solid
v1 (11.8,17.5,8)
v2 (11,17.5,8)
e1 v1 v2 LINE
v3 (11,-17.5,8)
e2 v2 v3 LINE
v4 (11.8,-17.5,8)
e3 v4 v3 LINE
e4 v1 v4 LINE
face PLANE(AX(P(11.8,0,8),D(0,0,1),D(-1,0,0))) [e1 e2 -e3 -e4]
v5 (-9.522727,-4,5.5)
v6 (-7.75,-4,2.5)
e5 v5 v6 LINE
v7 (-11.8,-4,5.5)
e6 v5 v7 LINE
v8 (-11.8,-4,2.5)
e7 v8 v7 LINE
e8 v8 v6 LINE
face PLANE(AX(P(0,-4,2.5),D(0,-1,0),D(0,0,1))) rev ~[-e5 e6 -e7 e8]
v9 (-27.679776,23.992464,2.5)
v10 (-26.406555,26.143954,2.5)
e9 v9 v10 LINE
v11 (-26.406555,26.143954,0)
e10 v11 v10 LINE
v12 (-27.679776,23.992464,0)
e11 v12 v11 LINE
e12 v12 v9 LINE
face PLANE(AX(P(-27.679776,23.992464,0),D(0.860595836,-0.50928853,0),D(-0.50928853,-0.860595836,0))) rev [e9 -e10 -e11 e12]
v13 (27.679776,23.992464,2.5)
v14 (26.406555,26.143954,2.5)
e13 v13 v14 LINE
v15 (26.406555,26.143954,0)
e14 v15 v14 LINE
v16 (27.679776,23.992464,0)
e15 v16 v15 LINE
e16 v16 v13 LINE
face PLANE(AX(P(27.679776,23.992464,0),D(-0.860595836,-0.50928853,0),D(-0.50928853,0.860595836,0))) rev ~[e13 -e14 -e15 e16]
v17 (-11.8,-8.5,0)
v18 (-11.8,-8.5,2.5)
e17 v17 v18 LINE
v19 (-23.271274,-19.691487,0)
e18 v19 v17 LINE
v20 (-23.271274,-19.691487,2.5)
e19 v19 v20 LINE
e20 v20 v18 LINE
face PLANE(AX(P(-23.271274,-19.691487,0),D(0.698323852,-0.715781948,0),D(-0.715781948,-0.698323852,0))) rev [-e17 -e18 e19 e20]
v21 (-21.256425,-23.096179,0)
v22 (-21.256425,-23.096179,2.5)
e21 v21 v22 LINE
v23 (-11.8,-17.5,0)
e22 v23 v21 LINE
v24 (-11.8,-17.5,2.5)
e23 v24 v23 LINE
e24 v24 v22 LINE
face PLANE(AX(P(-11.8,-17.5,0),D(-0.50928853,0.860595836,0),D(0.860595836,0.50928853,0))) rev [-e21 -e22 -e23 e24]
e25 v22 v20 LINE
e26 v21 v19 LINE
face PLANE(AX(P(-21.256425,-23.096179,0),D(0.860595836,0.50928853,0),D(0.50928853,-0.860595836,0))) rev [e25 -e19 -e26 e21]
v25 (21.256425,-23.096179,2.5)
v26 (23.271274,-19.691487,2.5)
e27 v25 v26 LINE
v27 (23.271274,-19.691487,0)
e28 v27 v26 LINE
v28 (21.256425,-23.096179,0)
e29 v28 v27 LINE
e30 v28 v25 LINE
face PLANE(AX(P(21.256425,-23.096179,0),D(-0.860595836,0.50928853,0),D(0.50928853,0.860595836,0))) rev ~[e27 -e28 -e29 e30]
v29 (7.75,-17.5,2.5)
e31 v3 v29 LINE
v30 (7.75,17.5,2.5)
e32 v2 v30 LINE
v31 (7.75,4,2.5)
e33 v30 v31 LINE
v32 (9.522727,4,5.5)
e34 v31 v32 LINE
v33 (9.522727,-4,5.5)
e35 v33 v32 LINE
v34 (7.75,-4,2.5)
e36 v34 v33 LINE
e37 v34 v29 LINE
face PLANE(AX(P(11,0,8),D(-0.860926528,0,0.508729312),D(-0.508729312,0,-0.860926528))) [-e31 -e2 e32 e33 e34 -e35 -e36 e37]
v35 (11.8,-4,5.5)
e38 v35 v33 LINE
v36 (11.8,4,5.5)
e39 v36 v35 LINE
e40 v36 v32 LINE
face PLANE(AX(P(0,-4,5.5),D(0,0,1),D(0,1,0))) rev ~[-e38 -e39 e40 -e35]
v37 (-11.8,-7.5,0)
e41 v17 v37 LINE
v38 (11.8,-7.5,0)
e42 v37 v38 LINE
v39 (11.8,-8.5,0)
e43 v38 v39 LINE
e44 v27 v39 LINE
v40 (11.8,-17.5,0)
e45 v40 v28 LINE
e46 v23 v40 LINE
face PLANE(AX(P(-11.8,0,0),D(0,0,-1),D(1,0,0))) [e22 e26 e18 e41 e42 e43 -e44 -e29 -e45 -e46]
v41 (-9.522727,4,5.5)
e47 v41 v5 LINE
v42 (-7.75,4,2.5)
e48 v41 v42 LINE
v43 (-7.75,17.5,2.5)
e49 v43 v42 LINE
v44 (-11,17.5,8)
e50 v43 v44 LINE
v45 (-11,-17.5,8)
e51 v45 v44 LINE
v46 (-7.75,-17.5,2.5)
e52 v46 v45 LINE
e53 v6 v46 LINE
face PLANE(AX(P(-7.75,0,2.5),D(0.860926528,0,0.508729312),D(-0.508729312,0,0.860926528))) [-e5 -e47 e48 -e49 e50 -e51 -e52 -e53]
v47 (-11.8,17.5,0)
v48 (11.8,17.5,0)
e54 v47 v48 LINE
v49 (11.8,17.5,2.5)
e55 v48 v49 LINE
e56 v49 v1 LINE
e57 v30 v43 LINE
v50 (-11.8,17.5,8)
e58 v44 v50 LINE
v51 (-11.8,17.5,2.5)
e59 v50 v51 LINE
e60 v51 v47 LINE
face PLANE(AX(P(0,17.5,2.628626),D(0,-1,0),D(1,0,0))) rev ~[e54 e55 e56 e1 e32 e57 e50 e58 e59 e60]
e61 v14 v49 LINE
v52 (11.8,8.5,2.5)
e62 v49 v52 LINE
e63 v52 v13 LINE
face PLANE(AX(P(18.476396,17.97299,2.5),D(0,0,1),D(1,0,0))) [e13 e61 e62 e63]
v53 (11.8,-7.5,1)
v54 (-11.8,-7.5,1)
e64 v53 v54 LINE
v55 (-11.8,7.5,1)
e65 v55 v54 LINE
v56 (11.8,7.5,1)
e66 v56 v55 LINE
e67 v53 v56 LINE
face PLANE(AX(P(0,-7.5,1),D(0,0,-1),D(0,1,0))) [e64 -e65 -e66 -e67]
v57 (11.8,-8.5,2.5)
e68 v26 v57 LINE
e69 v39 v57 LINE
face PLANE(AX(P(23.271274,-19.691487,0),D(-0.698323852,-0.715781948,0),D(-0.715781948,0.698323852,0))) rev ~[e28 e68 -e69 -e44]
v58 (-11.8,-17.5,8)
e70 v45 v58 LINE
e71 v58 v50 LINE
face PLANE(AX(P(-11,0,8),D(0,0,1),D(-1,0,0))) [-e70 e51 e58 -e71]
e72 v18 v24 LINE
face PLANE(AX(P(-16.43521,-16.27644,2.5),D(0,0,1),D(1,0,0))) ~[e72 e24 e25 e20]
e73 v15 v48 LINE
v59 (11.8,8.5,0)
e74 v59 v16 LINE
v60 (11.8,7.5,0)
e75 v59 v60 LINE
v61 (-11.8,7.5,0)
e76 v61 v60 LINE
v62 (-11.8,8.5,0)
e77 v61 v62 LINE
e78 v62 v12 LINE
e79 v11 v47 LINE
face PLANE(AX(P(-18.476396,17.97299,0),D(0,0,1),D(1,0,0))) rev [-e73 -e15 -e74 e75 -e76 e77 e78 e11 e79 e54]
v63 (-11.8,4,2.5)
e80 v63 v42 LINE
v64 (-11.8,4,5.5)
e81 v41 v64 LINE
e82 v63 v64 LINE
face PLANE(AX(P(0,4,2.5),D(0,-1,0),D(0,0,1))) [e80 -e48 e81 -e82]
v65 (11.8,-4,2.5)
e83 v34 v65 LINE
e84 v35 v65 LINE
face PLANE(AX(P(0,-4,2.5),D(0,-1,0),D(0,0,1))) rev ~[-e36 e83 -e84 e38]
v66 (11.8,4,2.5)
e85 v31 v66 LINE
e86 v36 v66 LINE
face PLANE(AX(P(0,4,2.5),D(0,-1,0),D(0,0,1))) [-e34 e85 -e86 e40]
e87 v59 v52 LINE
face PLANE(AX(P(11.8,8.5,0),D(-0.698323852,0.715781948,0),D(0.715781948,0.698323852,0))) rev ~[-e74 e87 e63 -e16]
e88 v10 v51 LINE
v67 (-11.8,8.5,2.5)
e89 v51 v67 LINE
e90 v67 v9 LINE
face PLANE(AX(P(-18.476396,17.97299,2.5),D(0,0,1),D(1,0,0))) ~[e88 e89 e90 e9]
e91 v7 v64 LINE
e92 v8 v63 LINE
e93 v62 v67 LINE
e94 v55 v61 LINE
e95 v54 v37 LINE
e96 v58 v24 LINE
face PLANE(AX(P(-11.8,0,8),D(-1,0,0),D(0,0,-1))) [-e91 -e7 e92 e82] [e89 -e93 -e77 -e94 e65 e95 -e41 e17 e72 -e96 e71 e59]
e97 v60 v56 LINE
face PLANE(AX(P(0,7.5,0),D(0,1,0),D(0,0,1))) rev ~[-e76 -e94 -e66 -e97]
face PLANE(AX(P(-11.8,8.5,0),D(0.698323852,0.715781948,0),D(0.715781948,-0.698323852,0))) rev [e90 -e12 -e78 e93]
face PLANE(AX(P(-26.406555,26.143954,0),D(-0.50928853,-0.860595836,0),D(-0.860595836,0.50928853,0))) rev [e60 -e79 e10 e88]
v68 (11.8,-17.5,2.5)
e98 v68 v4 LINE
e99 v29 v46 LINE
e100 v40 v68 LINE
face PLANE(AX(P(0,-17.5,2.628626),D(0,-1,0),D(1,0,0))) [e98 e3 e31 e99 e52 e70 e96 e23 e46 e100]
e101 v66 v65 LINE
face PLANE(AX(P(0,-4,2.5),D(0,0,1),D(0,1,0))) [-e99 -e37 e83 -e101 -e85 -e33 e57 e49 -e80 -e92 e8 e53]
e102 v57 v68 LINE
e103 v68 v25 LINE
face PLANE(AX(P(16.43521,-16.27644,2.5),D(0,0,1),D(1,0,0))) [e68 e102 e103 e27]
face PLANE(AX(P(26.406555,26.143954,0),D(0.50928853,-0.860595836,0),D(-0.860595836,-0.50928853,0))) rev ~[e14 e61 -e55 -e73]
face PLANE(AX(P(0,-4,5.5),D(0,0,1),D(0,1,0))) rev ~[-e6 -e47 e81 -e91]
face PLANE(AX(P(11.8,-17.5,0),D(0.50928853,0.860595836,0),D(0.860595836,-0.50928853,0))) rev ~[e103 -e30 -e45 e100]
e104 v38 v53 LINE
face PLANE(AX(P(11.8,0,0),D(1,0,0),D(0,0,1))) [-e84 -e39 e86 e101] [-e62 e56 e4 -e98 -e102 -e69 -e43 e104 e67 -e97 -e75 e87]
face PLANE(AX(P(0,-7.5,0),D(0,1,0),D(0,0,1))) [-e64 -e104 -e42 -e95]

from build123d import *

# Parameters (mm, degrees)
F1_DEPTH = 17.5
F2_W     = 8
F2_H     = 3
F2_W_2   = 15
F2_H_2   = 1
F3_DEPTH = 50
F5_DEPTH = 2.5


# Not quite as in the source:
# - a pattern or mirror of a feature is missing from the dataset's text; its kind, count and spacing are read off the source's solid


with BuildPart() as f1:
    # F0 (on Front) → F1 (new body, symmetric)
    with BuildSketch(Plane.XZ):
        Polygon((-11.8, 0), (0, 0), (11.8, 0), (11.8, 8), (11, 8), (7.75, 2.5), (0, 2.5), (-7.75, 2.5), (-11, 8), (-11.8, 8), align=None)
    extrude(amount=F1_DEPTH, both=True)

    # F2 (on Right) → F3 (cut, symmetric)
    with BuildSketch(Plane.YZ):
        with Locations((0, 4)):
            Rectangle(F2_W, F2_H)
        with Locations((0, 0.5)):
            Rectangle(F2_W_2, F2_H_2)
    extrude(amount=F3_DEPTH, both=True, mode=Mode.SUBTRACT)

    # F4 (on Top) → F5 (join)
    with BuildSketch(Plane.XY):
        Polygon((26.4065545634, 26.1439538722), (11.8, 17.5), (11.8, 8.5), (27.6797758895, 23.9924642824), align=None)
        Polygon((11.8, -8.5), (11.8, -17.5), (21.2564246661, -23.0961793217), (23.2712739184, -19.6914867497), align=None)
    f5 = extrude(amount=F5_DEPTH)

    # F5_copies: F5 across plane
    add(f5.mirror(Plane(origin=(0, 0, 0), x_dir=(0, 0, -1), z_dir=(-1, 0, 0))))


solid = f1.part
